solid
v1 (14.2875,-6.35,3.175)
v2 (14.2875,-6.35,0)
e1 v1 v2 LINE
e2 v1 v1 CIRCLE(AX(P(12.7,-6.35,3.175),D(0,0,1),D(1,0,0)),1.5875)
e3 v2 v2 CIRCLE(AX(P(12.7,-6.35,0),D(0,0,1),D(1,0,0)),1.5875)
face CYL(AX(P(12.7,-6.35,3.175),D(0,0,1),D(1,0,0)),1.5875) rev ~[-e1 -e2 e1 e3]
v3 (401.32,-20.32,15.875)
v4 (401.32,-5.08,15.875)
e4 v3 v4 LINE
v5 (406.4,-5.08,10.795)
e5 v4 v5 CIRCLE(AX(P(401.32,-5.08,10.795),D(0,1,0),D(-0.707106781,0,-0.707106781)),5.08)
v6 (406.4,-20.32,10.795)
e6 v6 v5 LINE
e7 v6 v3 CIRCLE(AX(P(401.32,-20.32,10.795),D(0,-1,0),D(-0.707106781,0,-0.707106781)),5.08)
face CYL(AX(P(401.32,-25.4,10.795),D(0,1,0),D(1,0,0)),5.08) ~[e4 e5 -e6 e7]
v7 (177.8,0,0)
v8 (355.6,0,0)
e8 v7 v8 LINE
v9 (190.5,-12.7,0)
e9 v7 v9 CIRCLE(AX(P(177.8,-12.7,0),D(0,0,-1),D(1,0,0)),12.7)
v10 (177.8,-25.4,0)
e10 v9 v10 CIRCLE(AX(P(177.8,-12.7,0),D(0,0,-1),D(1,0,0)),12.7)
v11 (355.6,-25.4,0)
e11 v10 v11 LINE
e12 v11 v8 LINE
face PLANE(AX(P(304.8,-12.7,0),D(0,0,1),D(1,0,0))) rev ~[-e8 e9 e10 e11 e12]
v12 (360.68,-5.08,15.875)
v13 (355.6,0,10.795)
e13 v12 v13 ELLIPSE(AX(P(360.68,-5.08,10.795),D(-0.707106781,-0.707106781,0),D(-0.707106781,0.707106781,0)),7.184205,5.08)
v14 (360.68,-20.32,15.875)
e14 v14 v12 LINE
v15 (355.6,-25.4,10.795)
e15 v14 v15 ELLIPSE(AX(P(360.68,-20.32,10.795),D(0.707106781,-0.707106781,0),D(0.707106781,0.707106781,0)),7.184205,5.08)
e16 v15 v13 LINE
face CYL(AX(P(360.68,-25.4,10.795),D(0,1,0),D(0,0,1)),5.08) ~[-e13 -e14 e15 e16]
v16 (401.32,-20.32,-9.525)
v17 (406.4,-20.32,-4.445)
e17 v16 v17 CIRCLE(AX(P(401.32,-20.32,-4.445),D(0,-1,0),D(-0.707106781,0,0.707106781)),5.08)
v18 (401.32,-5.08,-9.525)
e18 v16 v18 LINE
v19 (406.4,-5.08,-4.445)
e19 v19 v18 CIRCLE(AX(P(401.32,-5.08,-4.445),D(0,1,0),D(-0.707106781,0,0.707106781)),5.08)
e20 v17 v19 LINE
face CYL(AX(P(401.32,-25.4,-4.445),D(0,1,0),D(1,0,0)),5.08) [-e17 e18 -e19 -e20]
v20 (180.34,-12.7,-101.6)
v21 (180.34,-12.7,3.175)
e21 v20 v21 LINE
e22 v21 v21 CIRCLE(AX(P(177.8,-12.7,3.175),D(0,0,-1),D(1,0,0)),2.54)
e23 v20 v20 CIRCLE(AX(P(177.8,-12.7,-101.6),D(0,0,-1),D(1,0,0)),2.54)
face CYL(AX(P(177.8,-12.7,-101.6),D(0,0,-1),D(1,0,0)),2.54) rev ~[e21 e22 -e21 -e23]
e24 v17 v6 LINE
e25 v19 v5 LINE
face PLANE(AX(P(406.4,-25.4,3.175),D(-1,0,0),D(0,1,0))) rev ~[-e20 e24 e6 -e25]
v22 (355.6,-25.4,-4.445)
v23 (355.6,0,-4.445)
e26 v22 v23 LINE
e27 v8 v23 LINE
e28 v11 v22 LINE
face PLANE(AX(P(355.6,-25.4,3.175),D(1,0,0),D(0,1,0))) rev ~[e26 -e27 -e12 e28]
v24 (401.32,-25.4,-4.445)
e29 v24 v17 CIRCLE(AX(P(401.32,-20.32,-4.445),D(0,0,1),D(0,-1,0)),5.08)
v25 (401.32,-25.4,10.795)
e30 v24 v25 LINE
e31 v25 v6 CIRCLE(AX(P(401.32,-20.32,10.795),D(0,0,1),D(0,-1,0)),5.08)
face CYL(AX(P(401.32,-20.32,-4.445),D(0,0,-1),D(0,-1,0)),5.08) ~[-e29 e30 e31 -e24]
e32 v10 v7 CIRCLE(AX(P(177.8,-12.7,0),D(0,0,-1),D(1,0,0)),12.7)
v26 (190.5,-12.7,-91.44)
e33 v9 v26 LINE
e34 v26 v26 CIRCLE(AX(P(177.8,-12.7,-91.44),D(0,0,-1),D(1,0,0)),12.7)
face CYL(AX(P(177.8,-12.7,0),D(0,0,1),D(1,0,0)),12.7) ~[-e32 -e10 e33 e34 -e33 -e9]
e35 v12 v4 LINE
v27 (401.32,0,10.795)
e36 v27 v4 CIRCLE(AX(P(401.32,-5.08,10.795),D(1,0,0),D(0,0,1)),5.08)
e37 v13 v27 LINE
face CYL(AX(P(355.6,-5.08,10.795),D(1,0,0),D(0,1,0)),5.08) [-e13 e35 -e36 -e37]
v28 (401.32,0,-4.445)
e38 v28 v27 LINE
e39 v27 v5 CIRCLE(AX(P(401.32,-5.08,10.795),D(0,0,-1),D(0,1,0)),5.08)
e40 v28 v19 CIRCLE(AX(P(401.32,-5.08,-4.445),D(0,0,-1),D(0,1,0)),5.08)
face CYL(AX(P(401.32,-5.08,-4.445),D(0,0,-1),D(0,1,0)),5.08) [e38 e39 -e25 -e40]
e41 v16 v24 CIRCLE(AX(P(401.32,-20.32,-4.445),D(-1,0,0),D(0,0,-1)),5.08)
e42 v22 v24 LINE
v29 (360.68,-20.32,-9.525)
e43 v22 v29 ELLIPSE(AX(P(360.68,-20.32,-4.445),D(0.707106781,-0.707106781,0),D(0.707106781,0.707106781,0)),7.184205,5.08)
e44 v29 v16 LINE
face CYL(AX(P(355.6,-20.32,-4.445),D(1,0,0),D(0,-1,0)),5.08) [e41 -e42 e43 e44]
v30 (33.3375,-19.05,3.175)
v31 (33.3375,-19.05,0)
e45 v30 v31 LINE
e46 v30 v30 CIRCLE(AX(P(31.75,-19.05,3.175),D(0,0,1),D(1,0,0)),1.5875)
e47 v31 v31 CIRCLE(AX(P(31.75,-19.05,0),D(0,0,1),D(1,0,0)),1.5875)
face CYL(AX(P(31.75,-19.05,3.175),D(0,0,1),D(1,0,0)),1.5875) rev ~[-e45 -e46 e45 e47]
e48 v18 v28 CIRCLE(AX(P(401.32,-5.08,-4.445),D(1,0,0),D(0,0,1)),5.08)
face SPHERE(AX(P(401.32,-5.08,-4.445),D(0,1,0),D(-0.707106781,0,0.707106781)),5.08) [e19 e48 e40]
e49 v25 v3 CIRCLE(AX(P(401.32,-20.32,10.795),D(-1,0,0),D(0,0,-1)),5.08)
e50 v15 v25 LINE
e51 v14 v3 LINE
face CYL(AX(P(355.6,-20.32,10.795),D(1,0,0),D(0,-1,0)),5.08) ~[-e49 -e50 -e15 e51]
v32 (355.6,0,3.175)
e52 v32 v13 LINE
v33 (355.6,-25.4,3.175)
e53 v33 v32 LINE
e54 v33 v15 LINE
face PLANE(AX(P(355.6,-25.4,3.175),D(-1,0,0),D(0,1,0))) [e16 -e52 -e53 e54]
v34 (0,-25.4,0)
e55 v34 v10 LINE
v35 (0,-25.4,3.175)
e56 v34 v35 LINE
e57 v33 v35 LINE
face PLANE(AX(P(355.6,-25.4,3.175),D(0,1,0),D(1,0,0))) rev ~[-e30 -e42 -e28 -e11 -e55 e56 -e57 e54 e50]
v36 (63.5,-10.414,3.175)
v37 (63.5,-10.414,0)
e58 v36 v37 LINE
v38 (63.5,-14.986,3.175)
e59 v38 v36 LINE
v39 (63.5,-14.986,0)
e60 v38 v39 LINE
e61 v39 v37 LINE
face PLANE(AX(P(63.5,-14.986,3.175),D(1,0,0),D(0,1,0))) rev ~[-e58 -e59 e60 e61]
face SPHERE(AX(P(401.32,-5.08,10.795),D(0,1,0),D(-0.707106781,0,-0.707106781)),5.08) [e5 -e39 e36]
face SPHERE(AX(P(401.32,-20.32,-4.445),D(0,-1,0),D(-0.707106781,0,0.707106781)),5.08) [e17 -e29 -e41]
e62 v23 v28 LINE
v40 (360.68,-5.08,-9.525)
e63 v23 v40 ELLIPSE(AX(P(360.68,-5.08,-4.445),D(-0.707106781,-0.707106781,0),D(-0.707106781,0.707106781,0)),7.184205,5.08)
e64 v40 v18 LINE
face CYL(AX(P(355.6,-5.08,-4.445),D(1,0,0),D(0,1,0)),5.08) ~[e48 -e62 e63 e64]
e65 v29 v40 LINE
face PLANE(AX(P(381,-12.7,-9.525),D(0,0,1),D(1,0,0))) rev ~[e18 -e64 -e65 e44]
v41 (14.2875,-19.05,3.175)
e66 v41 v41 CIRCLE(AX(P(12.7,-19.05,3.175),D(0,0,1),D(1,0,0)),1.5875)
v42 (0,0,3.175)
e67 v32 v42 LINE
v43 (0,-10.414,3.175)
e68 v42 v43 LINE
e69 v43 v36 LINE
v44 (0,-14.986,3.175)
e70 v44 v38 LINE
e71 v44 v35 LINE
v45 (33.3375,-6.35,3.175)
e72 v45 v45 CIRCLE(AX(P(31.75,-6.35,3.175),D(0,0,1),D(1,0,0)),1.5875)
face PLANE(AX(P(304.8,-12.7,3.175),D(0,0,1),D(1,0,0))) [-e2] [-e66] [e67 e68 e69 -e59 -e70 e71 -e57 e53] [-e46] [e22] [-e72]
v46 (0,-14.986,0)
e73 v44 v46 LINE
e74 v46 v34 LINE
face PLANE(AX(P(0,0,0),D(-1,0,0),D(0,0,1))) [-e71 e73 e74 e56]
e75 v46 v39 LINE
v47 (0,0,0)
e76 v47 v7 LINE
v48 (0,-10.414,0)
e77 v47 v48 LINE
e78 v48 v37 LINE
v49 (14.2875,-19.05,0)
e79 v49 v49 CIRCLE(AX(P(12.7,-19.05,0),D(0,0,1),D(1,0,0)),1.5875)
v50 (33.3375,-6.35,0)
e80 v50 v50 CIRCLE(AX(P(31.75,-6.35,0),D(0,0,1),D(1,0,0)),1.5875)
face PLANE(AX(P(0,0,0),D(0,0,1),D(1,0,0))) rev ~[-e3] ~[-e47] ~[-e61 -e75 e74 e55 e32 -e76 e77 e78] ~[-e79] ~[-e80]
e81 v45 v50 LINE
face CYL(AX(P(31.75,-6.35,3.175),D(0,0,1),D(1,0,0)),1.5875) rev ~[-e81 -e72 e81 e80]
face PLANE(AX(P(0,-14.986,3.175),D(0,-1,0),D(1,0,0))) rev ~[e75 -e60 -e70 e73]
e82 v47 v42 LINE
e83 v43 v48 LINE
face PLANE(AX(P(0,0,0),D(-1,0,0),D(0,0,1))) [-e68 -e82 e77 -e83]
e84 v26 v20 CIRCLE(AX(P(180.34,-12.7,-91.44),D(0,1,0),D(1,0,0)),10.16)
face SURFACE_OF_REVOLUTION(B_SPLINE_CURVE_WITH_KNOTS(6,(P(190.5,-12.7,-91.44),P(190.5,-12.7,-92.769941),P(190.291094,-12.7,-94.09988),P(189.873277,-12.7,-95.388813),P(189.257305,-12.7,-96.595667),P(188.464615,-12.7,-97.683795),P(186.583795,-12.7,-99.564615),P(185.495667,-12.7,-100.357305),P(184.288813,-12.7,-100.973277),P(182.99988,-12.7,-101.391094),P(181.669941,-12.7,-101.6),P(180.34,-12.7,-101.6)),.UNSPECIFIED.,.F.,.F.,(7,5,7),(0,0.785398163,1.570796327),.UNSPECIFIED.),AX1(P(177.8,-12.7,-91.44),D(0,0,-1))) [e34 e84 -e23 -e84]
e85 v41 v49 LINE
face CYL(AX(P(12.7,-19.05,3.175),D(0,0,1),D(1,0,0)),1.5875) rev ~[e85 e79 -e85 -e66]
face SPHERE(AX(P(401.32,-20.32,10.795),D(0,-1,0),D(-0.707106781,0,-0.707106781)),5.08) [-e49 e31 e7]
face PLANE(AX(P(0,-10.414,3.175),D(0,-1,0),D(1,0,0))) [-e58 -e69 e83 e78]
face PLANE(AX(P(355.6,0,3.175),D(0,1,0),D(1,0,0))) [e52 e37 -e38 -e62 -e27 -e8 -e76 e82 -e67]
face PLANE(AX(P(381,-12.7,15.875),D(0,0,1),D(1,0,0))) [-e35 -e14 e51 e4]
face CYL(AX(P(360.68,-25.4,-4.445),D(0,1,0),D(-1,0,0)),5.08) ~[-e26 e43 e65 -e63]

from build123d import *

# Parameters (mm, degrees)
F0_W          = 203.2
F0_H          = 3.175
F1_DEPTH      = 25.4
F2_R          = 1.5875
F3_DEPTH      = 25.4
F4_R          = 12.7
F5_DEPTH      = 101.6
F6_R          = 10.16
F7_R          = 2.54
F8_DEPTH      = 254
F9_W          = 63.5
F9_H          = 4.572
F10_DEPTH     = 25.4
F11_W         = 203.2
F11_H         = 25.4
F12_DEPTH     = 3.175
F13_W         = 50.8
F13_H         = 25.4
F14_DEPTH     = 12.7
F15_DEPTH     = 12.7
F16_R         = 5.08
F17_T1_DEPTH  = 15.24
F17_S5_W      = 5.08
F17_S5_H      = 5.08
F17_T6_DEPTH  = 5.08
F17_S11_W     = 5.08
F17_S11_H     = 5.08
F17_T12_DEPTH = 5.08
F17_S17_W     = 5.08
F17_S17_H     = 5.08
F17_T18_DEPTH = 5.08
F17_S23_W     = 5.08
F17_S23_H     = 5.08
F17_T24_DEPTH = 5.08


# Not quite as in the source:
# - a fillet or chamfer that OpenCascade refuses, or shapes differently, is made with other operations: its cross-section is extruded or revolved along the edge and cut away or added


with BuildPart() as f1:
    # F0 (on Front) → F1 (new body)
    with BuildSketch(Plane.XZ):
        with Locations((101.6, 1.5875)):
            Rectangle(F0_W, F0_H)
    extrude(amount=F1_DEPTH)

    # F2 (on face) → F3 (cut)
    with BuildSketch(Plane.XY.offset(3.175)):
        with Locations((12.7, -19.05)):
            Circle(F2_R)
        with Locations((12.7, -6.35)):
            Circle(F2_R)
        with Locations((31.75, -6.35)):
            Circle(F2_R)
        with Locations((31.75, -19.05)):
            Circle(F2_R)
    extrude(amount=-F3_DEPTH, mode=Mode.SUBTRACT)

    # F4 (on face) → F5 (join)
    with BuildSketch(Plane(origin=(0, 0, 0), x_dir=(1, 0, 0), z_dir=(0, 0, -1))):
        with Locations((177.8, 12.7)):
            Circle(F4_R)
    extrude(amount=F5_DEPTH)

    # F6
    f6_edges = [f1.edges().sort_by_distance(p)[0] for p in [
        (165.1, -12.7, -101.6),
    ]]
    fillet(f6_edges, radius=F6_R)

    # F7 (on face) → F8 (cut)
    with BuildSketch(Plane(origin=(0, 0, -101.6), x_dir=(1, 0, 0), z_dir=(0, 0, -1))):
        with Locations((177.8, 12.7)):
            Circle(F7_R)
    extrude(amount=-F8_DEPTH, mode=Mode.SUBTRACT)

    # F9 (on face) → F10 (cut)
    with BuildSketch(Plane.XY.offset(3.175)):
        with Locations((31.75, -12.7)):
            Rectangle(F9_W, F9_H)
    extrude(amount=-F10_DEPTH, mode=Mode.SUBTRACT)

    # F11 (on face) → F12 (join)
    with BuildSketch(Plane.XY.offset(3.175)):
        with Locations((304.8, -12.7)):
            Rectangle(F11_W, F11_H)
    extrude(amount=-F12_DEPTH)

    # F13 (on face) → F14 (join)
    with BuildSketch(Plane.XY.offset(3.175)):
        with Locations((381, -12.7)):
            Rectangle(F13_W, F13_H)
    extrude(amount=F14_DEPTH)

    # F13 (on face) → F15 (join)
    with BuildSketch(Plane.XY.offset(3.175)):
        with Locations((381, -12.7)):
            Rectangle(F13_W, F13_H)
    extrude(amount=-F15_DEPTH)

    # F16
    f16_edges = [f1.edges().sort_by_distance(p)[0] for p in [
        (406.4, -12.7, 15.875),
        (406.4, -12.7, -9.525),
        (355.6, -12.7, 15.875),
        (355.6, -12.7, -9.525),
        (381, -25.4, 15.875),
        (381, -25.4, -9.525),
        (381, 0, 15.875),
        (381, 0, -9.525),
    ]]
    fillet(f16_edges, radius=F16_R)

    # F17: fillet of radius 5.08 on 2 edges, made by hand

    # F17_s2 → F17_t1 (cut)
    with BuildSketch(Plane.XY.offset(-4.445)):
        with BuildLine():
            ThreePointArc((401.32, 0), (404.9121024484, -1.4878975516), (406.4, -5.08))
            Line((406.4, -5.08), (406.4, 0))
            Line((406.4, 0), (401.32, 0))
        make_face()
        with BuildLine():
            ThreePointArc((401.32, -25.4), (404.9121024484, -23.9121024484), (406.4, -20.32))
            Line((406.4, -20.32), (406.4, -25.4))
            Line((406.4, -25.4), (401.32, -25.4))
        make_face()
    extrude(amount=F17_T1_DEPTH, mode=Mode.SUBTRACT)


with BuildPart() as f17_tool4:
    # F17_s5 → F17_t6 (new body)
    with BuildSketch(Plane.XZ.offset(20.32)):
        with Locations((403.86, 13.335)):
            Rectangle(F17_S5_W, F17_S5_H)
    extrude(amount=F17_T6_DEPTH)

    # F17_s7 → F17_t8 (revolve, cut)
    with BuildSketch(Plane(origin=(401.32, -20.32, 10.795), x_dir=(-0.7071067812, 0, -0.7071067812), z_dir=(-0.7071067812, 0, 0.7071067812))):
        with BuildLine():
            ThreePointArc((0, -5.08), (5.08, 0), (0, 5.08))
            Line((0, 5.08), (0, -5.08))
        make_face()
    revolve(axis=Axis((401.32, -20.32, 10.795), (0, -1, 0)), mode=Mode.SUBTRACT)


with BuildPart() as f1_1:
    add(f1.part)

    # F17_t3: cut F17_tool4
    add(f17_tool4.part, mode=Mode.SUBTRACT)


with BuildPart() as f17_tool10:
    # F17_s11 → F17_t12 (new body)
    with BuildSketch(Plane.XZ.offset(5.08)):
        with Locations((403.86, 13.335)):
            Rectangle(F17_S11_W, F17_S11_H)
    extrude(amount=-F17_T12_DEPTH)

    # F17_s13 → F17_t14 (revolve, cut)
    with BuildSketch(Plane(origin=(401.32, -5.08, 10.795), x_dir=(-0.7071067812, 0, -0.7071067812), z_dir=(0.7071067812, 0, -0.7071067812))):
        with BuildLine():
            ThreePointArc((0, -5.08), (5.08, 0), (0, 5.08))
            Line((0, 5.08), (0, -5.08))
        make_face()
    revolve(axis=Axis((401.32, -5.08, 10.795), (0, 1, 0)), mode=Mode.SUBTRACT)


with BuildPart() as f1_2:
    add(f1_1.part)

    # F17_t9: cut F17_tool10
    add(f17_tool10.part, mode=Mode.SUBTRACT)


with BuildPart() as f17_tool16:
    # F17_s17 → F17_t18 (new body)
    with BuildSketch(Plane.XZ.offset(5.08)):
        with Locations((403.86, -6.985)):
            Rectangle(F17_S17_W, F17_S17_H)
    extrude(amount=-F17_T18_DEPTH)

    # F17_s19 → F17_t20 (revolve, cut)
    with BuildSketch(Plane(origin=(401.32, -5.08, -4.445), x_dir=(-0.7071067812, 0, 0.7071067812), z_dir=(-0.7071067812, 0, -0.7071067812))):
        with BuildLine():
            ThreePointArc((0, -5.08), (5.08, 0), (0, 5.08))
            Line((0, 5.08), (0, -5.08))
        make_face()
    revolve(axis=Axis((401.32, -5.08, -4.445), (0, 1, 0)), mode=Mode.SUBTRACT)


with BuildPart() as f1_3:
    add(f1_2.part)

    # F17_t15: cut F17_tool16
    add(f17_tool16.part, mode=Mode.SUBTRACT)


with BuildPart() as f17_tool22:
    # F17_s23 → F17_t24 (new body)
    with BuildSketch(Plane.XZ.offset(20.32)):
        with Locations((403.86, -6.985)):
            Rectangle(F17_S23_W, F17_S23_H)
    extrude(amount=F17_T24_DEPTH)

    # F17_s25 → F17_t26 (revolve, cut)
    with BuildSketch(Plane(origin=(401.32, -20.32, -4.445), x_dir=(-0.7071067812, 0, 0.7071067812), z_dir=(0.7071067812, 0, 0.7071067812))):
        with BuildLine():
            ThreePointArc((0, -5.08), (5.08, 0), (0, 5.08))
            Line((0, 5.08), (0, -5.08))
        make_face()
    revolve(axis=Axis((401.32, -20.32, -4.445), (0, -1, 0)), mode=Mode.SUBTRACT)


with BuildPart() as f1_4:
    add(f1_3.part)

    # F17_t21: cut F17_tool22
    add(f17_tool22.part, mode=Mode.SUBTRACT)


solid = f1_4.part
